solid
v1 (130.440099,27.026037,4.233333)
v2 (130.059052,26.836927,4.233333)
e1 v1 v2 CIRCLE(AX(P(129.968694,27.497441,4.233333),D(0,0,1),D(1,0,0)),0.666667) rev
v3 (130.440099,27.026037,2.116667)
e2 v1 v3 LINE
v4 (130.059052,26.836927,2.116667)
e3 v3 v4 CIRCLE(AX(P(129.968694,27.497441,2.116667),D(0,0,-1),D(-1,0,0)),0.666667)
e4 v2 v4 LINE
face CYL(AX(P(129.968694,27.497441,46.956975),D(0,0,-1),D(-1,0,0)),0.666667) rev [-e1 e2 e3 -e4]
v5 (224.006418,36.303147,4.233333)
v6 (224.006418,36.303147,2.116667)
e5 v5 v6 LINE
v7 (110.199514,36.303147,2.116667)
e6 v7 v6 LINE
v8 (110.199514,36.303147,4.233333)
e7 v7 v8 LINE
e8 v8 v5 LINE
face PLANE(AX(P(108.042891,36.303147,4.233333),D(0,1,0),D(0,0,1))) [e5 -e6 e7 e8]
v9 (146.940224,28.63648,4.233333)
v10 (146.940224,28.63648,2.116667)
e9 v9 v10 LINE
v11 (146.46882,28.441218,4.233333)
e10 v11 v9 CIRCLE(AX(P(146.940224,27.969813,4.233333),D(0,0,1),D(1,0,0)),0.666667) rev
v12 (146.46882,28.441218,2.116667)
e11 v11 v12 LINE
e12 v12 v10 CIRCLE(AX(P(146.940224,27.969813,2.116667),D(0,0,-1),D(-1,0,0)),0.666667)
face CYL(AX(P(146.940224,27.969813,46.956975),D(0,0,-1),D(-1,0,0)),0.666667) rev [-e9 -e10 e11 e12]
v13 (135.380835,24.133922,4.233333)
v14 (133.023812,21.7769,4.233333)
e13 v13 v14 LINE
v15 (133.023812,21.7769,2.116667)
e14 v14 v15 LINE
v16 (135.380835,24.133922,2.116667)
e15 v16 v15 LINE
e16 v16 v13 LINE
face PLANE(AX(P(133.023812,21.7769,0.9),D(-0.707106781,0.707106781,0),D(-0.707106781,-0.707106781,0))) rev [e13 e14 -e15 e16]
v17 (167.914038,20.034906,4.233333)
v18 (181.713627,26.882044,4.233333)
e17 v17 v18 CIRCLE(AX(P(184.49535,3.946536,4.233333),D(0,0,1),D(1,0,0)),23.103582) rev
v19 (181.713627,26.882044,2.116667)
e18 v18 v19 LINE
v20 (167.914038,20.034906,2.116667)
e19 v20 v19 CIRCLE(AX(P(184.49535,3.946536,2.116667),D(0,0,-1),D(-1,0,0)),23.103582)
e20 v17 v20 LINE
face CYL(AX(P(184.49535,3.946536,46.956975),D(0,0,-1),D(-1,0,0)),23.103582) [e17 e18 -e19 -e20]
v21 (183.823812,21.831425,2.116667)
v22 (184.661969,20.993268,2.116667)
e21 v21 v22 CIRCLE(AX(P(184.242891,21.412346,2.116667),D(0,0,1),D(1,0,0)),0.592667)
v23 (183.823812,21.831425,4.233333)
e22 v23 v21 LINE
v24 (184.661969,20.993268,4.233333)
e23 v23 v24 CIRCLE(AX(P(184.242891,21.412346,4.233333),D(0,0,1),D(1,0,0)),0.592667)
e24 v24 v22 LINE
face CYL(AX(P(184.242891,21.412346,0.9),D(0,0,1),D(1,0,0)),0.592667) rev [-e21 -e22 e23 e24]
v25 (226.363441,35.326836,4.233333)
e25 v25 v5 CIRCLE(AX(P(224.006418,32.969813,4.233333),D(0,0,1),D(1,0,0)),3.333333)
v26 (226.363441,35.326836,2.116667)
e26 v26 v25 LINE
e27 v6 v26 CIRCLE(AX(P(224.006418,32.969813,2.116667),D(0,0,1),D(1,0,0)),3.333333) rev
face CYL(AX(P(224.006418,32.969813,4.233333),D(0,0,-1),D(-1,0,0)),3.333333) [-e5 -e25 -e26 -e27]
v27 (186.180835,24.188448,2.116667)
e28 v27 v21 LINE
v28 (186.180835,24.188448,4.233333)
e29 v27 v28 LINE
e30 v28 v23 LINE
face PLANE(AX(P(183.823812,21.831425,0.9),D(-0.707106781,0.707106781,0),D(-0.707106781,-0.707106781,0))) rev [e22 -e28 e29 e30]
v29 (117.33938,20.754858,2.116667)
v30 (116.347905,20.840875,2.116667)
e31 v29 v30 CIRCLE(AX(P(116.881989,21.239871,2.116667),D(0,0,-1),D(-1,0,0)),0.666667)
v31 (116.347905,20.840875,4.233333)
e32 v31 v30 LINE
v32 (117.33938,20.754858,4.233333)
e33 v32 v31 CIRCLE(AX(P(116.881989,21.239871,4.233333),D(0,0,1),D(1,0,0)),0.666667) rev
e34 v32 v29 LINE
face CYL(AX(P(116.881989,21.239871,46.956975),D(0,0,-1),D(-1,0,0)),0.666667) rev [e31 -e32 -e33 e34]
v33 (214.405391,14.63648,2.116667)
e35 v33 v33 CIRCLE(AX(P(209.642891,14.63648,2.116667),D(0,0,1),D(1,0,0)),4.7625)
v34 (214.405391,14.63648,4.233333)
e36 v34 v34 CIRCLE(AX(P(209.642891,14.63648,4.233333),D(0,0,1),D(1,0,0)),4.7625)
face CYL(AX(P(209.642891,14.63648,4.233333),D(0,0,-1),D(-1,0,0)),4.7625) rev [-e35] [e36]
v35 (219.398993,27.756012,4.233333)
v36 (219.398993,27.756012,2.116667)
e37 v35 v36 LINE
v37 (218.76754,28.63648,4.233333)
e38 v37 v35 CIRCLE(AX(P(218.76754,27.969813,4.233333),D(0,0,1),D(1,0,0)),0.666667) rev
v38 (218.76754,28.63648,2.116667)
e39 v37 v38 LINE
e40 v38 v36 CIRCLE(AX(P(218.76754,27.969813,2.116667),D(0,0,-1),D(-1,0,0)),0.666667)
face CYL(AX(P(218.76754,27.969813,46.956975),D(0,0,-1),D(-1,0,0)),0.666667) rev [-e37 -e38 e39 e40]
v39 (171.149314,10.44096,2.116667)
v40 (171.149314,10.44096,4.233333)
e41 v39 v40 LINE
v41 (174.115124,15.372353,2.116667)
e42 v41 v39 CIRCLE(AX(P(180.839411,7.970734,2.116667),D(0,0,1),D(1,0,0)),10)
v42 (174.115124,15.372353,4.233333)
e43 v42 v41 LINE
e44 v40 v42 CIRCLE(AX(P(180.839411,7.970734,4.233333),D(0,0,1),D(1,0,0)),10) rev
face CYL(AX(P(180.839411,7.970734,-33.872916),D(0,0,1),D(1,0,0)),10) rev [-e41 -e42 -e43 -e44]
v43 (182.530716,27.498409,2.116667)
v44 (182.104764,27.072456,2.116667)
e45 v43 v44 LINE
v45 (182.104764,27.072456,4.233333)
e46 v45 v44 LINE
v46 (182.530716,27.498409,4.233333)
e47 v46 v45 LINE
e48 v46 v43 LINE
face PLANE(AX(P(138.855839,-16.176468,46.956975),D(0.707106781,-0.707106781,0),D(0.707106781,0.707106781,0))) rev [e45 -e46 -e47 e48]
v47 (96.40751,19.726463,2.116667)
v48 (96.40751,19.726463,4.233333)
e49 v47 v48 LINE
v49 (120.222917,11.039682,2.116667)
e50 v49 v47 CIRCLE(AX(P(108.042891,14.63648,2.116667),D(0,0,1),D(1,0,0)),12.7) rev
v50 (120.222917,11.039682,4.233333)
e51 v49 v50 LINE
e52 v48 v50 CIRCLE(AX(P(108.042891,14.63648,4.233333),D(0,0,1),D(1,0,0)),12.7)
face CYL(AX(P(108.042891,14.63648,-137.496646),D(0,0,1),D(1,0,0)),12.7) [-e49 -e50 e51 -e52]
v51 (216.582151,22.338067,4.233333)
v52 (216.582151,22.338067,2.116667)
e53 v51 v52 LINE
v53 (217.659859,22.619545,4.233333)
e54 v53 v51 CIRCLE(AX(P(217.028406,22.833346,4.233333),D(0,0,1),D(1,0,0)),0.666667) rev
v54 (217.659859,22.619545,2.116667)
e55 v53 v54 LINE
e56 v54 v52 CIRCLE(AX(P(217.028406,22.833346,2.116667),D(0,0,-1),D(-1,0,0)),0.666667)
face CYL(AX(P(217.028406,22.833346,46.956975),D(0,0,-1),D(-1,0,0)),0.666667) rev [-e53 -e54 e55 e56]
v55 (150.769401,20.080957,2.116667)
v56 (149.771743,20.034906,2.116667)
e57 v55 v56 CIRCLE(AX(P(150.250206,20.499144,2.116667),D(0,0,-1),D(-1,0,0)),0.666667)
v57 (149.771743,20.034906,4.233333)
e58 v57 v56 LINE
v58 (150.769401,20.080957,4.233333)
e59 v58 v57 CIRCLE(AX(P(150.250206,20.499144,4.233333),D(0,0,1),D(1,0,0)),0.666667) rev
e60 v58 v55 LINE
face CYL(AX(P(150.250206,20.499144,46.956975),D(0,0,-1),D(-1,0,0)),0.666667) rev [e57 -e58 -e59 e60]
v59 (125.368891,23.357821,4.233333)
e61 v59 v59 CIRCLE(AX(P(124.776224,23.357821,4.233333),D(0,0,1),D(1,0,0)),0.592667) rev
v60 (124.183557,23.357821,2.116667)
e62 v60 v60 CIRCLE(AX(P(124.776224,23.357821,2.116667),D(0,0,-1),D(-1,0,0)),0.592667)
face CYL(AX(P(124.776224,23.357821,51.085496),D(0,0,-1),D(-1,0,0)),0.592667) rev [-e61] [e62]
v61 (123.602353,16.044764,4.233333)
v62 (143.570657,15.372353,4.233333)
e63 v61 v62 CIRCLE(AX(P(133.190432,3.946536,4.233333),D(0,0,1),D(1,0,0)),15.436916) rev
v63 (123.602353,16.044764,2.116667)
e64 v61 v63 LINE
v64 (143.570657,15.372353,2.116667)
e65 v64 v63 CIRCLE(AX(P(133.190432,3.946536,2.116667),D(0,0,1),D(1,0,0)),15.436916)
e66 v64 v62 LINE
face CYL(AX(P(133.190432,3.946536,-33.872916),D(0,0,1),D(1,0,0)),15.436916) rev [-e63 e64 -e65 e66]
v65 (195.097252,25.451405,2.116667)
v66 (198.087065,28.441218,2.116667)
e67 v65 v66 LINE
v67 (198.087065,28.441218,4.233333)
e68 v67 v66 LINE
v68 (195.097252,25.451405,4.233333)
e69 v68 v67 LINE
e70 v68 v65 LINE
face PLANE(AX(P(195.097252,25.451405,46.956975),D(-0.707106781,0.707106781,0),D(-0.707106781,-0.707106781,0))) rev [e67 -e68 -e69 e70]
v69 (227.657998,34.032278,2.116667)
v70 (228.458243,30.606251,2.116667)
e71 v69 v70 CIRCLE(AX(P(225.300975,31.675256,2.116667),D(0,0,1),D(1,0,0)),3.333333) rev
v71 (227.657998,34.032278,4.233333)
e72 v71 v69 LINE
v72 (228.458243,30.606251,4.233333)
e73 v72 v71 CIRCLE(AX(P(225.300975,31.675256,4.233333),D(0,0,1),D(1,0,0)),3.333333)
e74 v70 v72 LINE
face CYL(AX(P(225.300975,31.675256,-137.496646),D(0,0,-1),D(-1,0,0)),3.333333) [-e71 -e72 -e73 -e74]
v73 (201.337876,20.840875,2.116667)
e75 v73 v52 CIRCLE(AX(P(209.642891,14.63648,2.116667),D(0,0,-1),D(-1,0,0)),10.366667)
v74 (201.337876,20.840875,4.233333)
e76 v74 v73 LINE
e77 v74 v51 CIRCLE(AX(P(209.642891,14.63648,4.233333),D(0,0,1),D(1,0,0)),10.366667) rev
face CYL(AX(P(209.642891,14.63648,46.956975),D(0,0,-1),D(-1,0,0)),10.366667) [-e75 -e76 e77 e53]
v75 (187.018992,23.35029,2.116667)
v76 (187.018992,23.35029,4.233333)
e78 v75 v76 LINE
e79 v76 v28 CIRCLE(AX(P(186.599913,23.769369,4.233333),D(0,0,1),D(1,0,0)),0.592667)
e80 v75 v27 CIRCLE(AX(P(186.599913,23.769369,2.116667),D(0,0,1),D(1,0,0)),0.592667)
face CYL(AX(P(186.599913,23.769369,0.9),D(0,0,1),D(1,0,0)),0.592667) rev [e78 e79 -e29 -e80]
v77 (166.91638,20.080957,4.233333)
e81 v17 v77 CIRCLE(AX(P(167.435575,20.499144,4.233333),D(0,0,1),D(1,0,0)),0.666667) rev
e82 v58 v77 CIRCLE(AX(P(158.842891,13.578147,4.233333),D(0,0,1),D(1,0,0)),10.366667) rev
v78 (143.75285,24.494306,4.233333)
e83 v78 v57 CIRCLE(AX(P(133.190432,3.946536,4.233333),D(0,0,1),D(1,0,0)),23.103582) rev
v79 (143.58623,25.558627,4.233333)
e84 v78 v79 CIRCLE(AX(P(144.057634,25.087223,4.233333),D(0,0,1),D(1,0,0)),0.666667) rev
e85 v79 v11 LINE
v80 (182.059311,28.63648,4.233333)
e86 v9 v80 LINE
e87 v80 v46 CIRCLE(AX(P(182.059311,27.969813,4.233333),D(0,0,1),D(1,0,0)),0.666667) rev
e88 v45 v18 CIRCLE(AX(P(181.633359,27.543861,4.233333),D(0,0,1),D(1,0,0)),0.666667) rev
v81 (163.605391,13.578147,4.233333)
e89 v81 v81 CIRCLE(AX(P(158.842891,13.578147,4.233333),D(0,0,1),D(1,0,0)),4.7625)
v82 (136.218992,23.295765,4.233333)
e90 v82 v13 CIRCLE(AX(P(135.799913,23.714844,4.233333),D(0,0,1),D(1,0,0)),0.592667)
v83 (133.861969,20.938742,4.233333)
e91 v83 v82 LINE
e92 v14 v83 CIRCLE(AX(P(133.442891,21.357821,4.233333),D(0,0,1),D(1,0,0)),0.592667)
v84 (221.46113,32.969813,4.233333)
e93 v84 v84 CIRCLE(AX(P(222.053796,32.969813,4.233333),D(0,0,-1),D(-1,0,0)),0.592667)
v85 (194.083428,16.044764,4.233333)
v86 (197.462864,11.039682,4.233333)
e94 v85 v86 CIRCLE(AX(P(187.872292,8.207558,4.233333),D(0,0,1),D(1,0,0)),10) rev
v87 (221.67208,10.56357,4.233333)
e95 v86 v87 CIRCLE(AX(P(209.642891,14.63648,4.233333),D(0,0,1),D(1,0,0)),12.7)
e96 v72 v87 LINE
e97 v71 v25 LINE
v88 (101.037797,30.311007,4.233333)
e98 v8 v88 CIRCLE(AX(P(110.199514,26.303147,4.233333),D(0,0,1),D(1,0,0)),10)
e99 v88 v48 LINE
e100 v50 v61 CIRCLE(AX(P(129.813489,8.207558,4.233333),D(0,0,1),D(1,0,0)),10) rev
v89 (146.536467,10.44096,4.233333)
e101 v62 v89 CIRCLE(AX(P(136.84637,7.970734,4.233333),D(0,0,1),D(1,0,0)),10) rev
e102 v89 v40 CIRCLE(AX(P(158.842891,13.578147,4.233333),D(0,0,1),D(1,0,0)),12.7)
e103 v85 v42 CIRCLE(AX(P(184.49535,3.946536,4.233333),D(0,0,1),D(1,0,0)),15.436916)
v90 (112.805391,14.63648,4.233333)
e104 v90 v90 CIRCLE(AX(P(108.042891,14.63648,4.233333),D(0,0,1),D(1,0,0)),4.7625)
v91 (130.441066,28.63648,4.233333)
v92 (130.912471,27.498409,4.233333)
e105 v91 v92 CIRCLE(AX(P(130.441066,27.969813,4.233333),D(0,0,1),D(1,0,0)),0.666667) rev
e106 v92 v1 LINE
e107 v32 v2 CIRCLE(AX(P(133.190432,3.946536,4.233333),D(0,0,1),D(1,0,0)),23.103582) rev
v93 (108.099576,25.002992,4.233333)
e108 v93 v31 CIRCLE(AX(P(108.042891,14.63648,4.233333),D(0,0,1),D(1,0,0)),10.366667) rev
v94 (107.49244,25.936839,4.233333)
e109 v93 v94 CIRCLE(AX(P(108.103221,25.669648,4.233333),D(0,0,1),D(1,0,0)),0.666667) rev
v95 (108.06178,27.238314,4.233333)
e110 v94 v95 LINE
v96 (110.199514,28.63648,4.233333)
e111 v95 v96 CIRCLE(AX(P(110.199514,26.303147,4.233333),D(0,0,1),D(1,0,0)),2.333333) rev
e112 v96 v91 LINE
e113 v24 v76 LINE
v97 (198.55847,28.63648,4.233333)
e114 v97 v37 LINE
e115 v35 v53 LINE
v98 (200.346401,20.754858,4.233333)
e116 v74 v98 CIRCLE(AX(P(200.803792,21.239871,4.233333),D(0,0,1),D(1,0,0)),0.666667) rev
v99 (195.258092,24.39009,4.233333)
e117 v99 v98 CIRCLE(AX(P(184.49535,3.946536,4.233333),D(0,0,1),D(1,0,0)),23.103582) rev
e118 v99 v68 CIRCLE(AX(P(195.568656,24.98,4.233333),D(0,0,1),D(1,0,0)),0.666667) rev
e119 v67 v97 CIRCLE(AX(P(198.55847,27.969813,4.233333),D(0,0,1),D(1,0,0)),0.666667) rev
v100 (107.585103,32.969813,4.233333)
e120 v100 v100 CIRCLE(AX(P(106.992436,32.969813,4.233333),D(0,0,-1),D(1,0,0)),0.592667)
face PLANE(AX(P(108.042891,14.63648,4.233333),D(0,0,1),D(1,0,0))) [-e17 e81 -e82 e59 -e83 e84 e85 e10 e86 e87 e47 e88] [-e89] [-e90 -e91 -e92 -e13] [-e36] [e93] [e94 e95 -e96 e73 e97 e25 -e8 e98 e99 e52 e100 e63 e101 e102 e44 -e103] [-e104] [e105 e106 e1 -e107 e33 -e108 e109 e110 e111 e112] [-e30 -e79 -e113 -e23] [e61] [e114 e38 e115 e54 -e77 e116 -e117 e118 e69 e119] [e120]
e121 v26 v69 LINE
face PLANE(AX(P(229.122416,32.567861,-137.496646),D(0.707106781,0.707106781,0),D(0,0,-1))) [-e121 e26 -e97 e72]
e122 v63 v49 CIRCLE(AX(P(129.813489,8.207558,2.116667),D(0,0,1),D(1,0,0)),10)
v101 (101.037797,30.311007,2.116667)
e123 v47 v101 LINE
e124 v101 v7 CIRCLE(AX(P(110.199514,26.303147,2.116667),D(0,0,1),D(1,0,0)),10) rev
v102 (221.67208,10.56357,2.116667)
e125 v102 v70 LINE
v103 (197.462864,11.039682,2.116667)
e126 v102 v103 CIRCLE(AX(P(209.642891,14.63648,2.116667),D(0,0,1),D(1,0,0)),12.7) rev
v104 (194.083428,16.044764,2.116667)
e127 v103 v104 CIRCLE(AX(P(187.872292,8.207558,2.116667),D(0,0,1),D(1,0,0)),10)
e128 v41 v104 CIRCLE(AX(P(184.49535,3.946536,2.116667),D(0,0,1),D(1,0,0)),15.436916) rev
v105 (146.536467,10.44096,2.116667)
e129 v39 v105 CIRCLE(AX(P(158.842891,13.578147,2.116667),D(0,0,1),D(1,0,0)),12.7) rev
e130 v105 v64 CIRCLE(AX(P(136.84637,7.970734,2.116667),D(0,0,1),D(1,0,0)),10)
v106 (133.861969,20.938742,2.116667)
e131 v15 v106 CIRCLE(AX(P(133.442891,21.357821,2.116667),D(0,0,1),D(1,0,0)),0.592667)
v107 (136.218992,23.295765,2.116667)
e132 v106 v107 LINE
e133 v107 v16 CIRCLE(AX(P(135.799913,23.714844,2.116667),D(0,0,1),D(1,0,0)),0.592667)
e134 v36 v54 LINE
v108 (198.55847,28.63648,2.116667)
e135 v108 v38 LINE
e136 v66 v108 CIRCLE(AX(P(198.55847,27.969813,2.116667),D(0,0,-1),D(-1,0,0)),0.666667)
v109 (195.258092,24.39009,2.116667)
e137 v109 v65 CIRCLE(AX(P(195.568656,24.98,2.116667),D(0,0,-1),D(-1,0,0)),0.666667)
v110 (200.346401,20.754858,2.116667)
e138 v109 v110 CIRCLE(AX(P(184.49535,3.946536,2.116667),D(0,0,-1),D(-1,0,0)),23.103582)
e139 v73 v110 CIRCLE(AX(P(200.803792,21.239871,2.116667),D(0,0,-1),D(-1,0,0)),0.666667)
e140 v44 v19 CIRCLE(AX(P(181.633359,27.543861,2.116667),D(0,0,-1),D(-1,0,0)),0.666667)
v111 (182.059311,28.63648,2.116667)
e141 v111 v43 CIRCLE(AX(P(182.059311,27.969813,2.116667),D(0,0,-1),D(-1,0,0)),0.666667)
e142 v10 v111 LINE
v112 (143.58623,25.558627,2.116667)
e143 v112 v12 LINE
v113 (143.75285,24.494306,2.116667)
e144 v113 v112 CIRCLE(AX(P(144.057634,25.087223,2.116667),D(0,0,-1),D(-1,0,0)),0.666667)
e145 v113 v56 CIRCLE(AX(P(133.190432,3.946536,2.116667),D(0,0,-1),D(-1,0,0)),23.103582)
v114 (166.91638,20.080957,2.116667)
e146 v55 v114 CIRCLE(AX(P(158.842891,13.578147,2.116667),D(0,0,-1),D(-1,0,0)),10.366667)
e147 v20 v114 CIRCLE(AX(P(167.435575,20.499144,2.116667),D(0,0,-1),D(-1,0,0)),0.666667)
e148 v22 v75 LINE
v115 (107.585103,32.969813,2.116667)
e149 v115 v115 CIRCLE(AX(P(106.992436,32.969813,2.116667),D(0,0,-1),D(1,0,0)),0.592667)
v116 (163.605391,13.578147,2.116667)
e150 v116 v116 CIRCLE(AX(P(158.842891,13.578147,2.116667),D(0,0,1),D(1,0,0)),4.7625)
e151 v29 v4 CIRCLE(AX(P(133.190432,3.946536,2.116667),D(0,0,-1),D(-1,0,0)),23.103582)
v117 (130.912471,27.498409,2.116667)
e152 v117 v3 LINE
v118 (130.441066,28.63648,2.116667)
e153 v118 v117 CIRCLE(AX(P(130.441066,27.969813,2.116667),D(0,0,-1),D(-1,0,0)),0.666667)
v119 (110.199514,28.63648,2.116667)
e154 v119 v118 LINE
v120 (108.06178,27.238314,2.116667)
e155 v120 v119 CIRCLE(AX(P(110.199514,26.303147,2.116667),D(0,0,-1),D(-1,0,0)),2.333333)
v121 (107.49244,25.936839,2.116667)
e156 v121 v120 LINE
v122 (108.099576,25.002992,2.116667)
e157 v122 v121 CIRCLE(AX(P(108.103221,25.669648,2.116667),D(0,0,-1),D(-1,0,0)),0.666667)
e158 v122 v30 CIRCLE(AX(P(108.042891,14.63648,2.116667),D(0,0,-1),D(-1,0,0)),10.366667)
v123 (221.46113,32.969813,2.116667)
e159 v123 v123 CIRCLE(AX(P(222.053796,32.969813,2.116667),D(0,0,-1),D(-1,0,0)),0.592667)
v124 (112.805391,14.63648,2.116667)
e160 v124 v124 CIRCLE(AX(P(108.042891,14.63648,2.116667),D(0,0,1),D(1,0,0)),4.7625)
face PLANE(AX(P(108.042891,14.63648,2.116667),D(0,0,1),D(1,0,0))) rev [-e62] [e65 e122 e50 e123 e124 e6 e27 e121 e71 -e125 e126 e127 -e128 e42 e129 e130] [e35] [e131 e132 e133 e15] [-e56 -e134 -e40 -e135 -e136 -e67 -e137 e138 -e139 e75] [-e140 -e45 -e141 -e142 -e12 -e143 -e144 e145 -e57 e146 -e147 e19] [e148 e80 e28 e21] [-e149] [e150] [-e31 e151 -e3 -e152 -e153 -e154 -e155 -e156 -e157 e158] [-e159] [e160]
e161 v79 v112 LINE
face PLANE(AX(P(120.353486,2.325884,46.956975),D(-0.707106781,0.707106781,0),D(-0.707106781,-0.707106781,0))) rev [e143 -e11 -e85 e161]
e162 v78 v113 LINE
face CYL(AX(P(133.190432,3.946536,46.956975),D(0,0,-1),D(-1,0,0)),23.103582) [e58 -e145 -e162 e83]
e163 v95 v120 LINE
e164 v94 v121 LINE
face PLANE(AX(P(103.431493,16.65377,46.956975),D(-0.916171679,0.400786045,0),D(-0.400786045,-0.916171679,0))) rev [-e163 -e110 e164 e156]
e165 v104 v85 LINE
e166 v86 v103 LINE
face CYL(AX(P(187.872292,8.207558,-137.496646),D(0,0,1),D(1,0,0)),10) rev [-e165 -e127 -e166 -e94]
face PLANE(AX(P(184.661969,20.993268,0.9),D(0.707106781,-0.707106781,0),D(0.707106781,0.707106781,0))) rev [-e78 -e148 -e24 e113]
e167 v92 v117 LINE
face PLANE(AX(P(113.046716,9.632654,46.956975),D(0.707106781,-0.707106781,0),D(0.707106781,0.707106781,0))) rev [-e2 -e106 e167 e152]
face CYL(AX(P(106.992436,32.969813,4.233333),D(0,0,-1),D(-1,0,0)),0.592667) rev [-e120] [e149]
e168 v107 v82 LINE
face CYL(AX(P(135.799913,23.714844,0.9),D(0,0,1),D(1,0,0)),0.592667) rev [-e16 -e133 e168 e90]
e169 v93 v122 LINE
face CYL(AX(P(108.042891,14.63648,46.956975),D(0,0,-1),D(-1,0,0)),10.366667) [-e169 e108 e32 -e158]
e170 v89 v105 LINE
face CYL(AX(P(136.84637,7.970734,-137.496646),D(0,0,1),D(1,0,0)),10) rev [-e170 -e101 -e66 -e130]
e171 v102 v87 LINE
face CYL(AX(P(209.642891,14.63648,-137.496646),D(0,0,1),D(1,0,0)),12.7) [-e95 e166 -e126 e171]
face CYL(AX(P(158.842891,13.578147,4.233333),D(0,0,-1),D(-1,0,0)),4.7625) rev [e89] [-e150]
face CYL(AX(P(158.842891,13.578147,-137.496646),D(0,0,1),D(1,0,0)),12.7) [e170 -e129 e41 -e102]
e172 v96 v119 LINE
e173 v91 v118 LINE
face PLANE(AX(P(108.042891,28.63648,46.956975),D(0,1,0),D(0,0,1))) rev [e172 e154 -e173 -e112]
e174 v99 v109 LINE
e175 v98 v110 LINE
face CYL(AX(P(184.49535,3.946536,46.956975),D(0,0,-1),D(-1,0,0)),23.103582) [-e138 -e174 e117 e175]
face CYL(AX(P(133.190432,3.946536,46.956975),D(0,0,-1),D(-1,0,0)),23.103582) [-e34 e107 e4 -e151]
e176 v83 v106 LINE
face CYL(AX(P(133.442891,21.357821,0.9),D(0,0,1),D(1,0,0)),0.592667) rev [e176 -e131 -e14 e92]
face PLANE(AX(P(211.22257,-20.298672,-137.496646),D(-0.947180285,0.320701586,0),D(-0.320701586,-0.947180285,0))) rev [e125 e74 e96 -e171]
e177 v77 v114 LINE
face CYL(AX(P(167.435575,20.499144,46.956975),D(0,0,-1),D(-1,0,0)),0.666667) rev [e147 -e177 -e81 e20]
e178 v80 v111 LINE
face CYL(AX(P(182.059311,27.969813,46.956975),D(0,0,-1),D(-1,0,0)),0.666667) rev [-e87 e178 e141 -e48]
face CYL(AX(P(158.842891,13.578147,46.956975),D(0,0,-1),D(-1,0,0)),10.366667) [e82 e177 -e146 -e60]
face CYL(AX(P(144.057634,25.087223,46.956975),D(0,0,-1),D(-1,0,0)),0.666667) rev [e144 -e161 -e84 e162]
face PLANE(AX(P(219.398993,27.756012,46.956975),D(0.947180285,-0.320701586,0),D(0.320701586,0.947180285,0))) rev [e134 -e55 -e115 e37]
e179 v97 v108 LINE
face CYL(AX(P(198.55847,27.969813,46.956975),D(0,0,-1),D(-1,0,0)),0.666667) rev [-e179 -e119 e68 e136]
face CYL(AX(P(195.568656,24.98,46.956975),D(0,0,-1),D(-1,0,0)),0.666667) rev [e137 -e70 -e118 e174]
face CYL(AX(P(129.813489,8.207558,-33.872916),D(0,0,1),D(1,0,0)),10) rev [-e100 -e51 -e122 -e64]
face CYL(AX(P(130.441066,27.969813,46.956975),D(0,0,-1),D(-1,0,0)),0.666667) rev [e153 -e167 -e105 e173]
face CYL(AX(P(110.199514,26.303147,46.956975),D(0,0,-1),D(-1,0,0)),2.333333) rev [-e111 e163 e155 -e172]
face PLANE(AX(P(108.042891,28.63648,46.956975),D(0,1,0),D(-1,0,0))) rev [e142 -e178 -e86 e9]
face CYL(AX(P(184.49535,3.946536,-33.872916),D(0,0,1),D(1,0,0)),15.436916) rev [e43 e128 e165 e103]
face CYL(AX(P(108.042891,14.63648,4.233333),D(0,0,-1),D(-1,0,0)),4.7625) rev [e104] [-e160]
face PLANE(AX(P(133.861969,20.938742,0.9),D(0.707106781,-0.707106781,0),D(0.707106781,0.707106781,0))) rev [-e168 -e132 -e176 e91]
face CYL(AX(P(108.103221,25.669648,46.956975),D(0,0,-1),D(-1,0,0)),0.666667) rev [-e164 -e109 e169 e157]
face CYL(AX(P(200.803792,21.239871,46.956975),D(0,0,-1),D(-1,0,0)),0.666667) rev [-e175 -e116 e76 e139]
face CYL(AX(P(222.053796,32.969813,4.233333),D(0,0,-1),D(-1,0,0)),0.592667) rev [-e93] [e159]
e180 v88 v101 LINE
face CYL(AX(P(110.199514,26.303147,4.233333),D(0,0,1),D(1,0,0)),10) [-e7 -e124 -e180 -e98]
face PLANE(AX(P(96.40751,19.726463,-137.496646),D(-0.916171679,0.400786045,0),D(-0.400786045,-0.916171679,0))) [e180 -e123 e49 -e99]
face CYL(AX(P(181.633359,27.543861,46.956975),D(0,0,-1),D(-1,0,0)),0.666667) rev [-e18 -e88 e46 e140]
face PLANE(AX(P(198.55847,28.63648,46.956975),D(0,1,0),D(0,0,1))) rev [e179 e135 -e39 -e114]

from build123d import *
from build123d.topology import SkipClean

# Parameters (mm, degrees)
SKETCH1_R           = 14.2875
BOSS_EXTRUDE1_DEPTH = 6.35
FILLET1_R           = 10
FILLET2_R           = 20
SKETCH2_R           = 1.778
CUT_EXTRUDE1_DEPTH  = 6.35
FILLET4_R           = 28.4734
BOSS_EXTRUDE2_DEPTH = 6.35
FILLET7_R           = 30
CUT_EXTRUDE4_DEPTH  = 6.35
FILLET9_DEPTH       = 6.35
SKETCH6_R           = 1.778
CUT_EXTRUDE5_DEPTH  = 10
CHAMFER1_SIZE       = 15
CHAMFER1_SIZE2      = 11.830755168
FILLET11_R          = 10
BOSS_EXTRUDE3_DEPTH = 6.35
SKETCH8_R           = 1.778
BOSS_EXTRUDE4_DEPTH = 6.35
CUT_EXTRUDE6_DEPTH  = 10
FILLET12_R          = 10
FILLET13_R          = 10
FILLET14_R          = 10
FILLET15_R          = 10
FILLET16_R          = 10
CUT_EXTRUDE7_DEPTH  = 10
BOSS_EXTRUDE5_START = -6.35
SKETCH10_R          = 1.778
BOSS_EXTRUDE5_DEPTH = 6.35
FILLET17_R          = 30
BOSS_EXTRUDE6_START = -6.35
BOSS_EXTRUDE6_DEPTH = 6.35
SCALE1_SCALE        = 0.333333333


with BuildPart() as part:
    # Sketch1 → Boss-Extrude1 (new body)
    with BuildSketch(Plane.XY):
        with BuildLine():
            Line((76.2, 30), (19.765397885, -21.612188753))
            ThreePointArc((19.765397885, -21.612188753), (-7.664310495, -28.266871084), (-27.975511048, -8.66766623))
            Line((-27.975511048, -8.66766623), (-30.661018302, 0))
            Line((-30.661018302, 0), (-10.522036605, 65))
            Line((-10.522036605, 65), (355.6, 65))
            Line((355.6, 65), (332.775511048, -8.66766623))
            ThreePointArc((332.775511048, -8.66766623), (312.464310495, -28.266871084), (285.034602115, -21.612188753))
            Line((285.034602115, -21.612188753), (228.6, 30))
            Line((228.6, 30), (172.803916322, -24.185422532))
            ThreePointArc((172.803916322, -24.185422532), (152.4, -32.637001398), (131.996083678, -24.185422532))
            Line((131.996083678, -24.185422532), (76.2, 30))
        make_face()
        Circle(SKETCH1_R, mode=Mode.SUBTRACT)
        with Locations((152.4, -3.175)):
            Circle(SKETCH1_R, mode=Mode.SUBTRACT)
        with Locations((304.8, 0)):
            Circle(SKETCH1_R, mode=Mode.SUBTRACT)
    extrude(amount=BOSS_EXTRUDE1_DEPTH)

    # Fillet1
    fillet1_edges = [part.edges().sort_by_distance(p)[0] for p in [
        (-10.522036605, 65, 3.175),
        (355.6, 65, 3.175),
    ]]
    fillet(fillet1_edges, radius=FILLET1_R)

    # Fillet2
    fillet2_edges = [part.edges().sort_by_distance(p)[0] for p in [
        (228.6, 30, 3.175),
        (76.2, 30, 3.175),
    ]]
    fillet(fillet2_edges, radius=FILLET2_R)

    # Sketch2 → Cut-Extrude1 (cut)
    with BuildSketch(Plane(origin=(0, 0, 0), x_dir=(-1, 0, 0), z_dir=(0, 0, -1))):
        with Locations((-229.01165953, 23.51851186)):
            Circle(SKETCH2_R)
        with Locations((-342.03271747, 55)):
            Circle(SKETCH2_R)
        with Locations((-76.34605429, 23.51851186)):
            Circle(SKETCH2_R)
        with Locations(Location((3.151363828, 55, 0), (0, 0, 180))):
            Circle(SKETCH2_R)
    extrude(amount=-CUT_EXTRUDE1_DEPTH, mode=Mode.SUBTRACT)

    # Fillet4
    fillet4_edges = [part.edges().sort_by_distance(p)[0] for p in [
        (-30.661018302, 0, 3.175),
    ]]
    fillet(fillet4_edges, radius=FILLET4_R)

    # Sketch4 → Boss-Extrude2 (add)
    with BuildSketch(Plane.XY.offset(6.35)):
        with BuildLine():
            ThreePointArc((-12.703394916, 57.95951045), (-9.084528898, 63.04969268), (-3.151363828, 65))
            Line((-3.151363828, 65), (-13.151363828, 65))
            Line((-13.151363828, 65), (-34.906140988, 15.269948308))
            ThreePointArc((-34.906140988, 15.269948308), (-10.316360553, -36.676732474), (37.748130536, -5.166105019))
            Line((37.748130536, -5.166105019), (19.765397885, -21.612188753))
            ThreePointArc((19.765397885, -21.612188753), (-7.664310495, -28.266871084), (-27.975511048, -8.66766623))
            Line((-27.975511048, -8.66766623), (-28.050159667, -8.426732485))
            ThreePointArc((-28.050159667, -8.426732485), (-29.325679471, 0), (-28.050159667, 8.426732485))
            Line((-28.050159667, 8.426732485), (-12.703394916, 57.95951045))
        make_face()
        with BuildLine():
            Line((367.03271747, 65), (342.03271747, 65))
            ThreePointArc((342.03271747, 65), (350.08241015, 60.93316507), (351.584748558, 52.04048955))
            Line((351.584748558, 52.04048955), (332.775511048, -8.66766623))
            ThreePointArc((332.775511048, -8.66766623), (312.464310495, -28.266871084), (285.034602115, -21.612188753))
            Line((285.034602115, -21.612188753), (267.051869464, -5.166105019))
            ThreePointArc((267.051869464, -5.166105019), (301.177259665, -37.927374711), (340.887568868, -12.218730424))
            Line((340.887568868, -12.218730424), (367.03271747, 65))
        make_face()
        with BuildLine():
            Line((62.290842982, 17.279399331), (60.592342389, 15.72603792))
            Line((60.592342389, 15.72603792), (68.130864542, 20.996768873))
            ThreePointArc((68.130864542, 20.996768873), (65.048790473, 19.392687011), (62.290842982, 17.279399331))
        make_face()
        with BuildLine():
            ThreePointArc((74.888341467, 22.500495492), (71.444046197, 22.043232685), (68.130864542, 20.996768873))
            Line((68.130864542, 20.996768873), (105.753753933, 1.29937195))
            Line((105.753753933, 1.29937195), (89.721872743, 16.868462091))
            ThreePointArc((89.721872743, 16.868462091), (84.206374965, 20.662880592), (77.747671619, 22.424549857))
            ThreePointArc((77.747671619, 22.424549857), (76.393262458, 25.295885031), (74.888341467, 22.500495492))
        make_face()
        with BuildLine():
            Line((220.832871891, 20.771986703), (256.207126926, 4.751939547))
            Line((256.207126926, 4.751939547), (242.509157018, 17.279399331))
            ThreePointArc((242.509157018, 17.279399331), (236.916143222, 20.892449631), (230.446997722, 22.469184326))
            ThreePointArc((230.446997722, 22.469184326), (229.01165953, 25.29651186), (227.576321337, 22.469184326))
            ThreePointArc((227.576321337, 22.469184326), (224.130268968, 21.915910418), (220.832871891, 20.771986703))
        make_face()
        with BuildLine():
            Line((211.556759647, 13.448745522), (220.832871891, 20.771986703))
            ThreePointArc((220.832871891, 20.771986703), (217.784547298, 19.072249628), (215.078127257, 16.868462091))
            Line((215.078127257, 16.868462091), (211.556759647, 13.448745522))
        make_face()
        with BuildLine():
            Line((131.996083678, -24.185422532), (114.514059271, -7.208050345))
            ThreePointArc((114.514059271, -7.208050345), (152.4, -41.275), (190.285940729, -7.208050345))
            Line((190.285940729, -7.208050345), (172.803916322, -24.185422532))
            ThreePointArc((172.803916322, -24.185422532), (152.4, -32.637001398), (131.996083678, -24.185422532))
        make_face()
    extrude(amount=-BOSS_EXTRUDE2_DEPTH)

    # Fillet7
    # the kernel refuses this fillet: 30 mm, written as the material it adds along each edge
    with BuildSketch(Plane(origin=(220.832871891, 20.771986703, 6.35), x_dir=(-0.7848829847834699, -0.6196440108621978, 0), z_dir=(0, 0, -1))) as fillet7_piece_1:
        with BuildLine():
            CenterArc((18.669895515, -29.207154991), FILLET7_R, 103.201773783, 49.45286053)
            Line((-7.977718615, -15.426564975), (0, 0))
            Line((0, 0), (11.818465203, 0))
        make_face()
    extrude(amount=6.35)
    with BuildSketch(Plane(origin=(68.130864542, 20.996768873, 6.35), x_dir=(-0.819550218760279, -0.5730073637659283, 0), z_dir=(0, 0, -1))) as fillet7_piece_2:
        with BuildLine():
            CenterArc((19.112116789, -28.314616862), FILLET7_R, 109.296600171, 43.297831689)
            Line((-7.521002941, -14.506034983), (0, 0))
            Line((0, 0), (9.198365128, 0))
        make_face()
    extrude(amount=6.35)
    # the kernel refuses this fillet: 30 mm, written as the material it takes off along each edge
    with BuildSketch(Plane(origin=(-13.151363828, 65, 55.403084312), x_dir=(-0.4007860448353176, -0.9161716794713002, 0), z_dir=(0, 0, -1))) as fillet7_2_piece_1:
        with BuildLine():
            CenterArc((FILLET7_R * 0.65404112416, -FILLET7_R), FILLET7_R, 90, 66.372672864)
            Line((-FILLET7_R * 0.262130555312, -FILLET7_R * 0.599213955165), (0, 0))
            Line((0, 0), (FILLET7_R * 0.65404112416, 0))
        make_face()
    extrude(amount=104.456168624, mode=Mode.SUBTRACT)

    # Sketch5 → Cut-Extrude4 (cut)
    with BuildSketch(Plane.XY.offset(6.35)):
        with BuildLine():
            ThreePointArc((202.727550006, 25.783673337), (222.609463156, 31.248183301), (242.841525508, 27.271376461))
            Line((242.841525508, 27.271376461), (264.569178734, 17.431507638))
            Line((264.569178734, 17.431507638), (281.763141289, 1.706792524))
            ThreePointArc((281.763141289, 1.706792524), (305.653980027, 23.084209281), (327.9, 0))
            ThreePointArc((327.9, 0), (327.592925131, -3.754006392), (326.679864589, -7.408206635))
            Line((326.679864589, -7.408206635), (346.117455511, 50))
            Line((346.117455511, 50), (6.469869897, 50))
            ThreePointArc((6.469869897, 50), (-1.740585021, 47.553423041), (-7.272705295, 41.011790673))
            Line((-7.272705295, 41.011790673), (-21.163565796, 9.258157636))
            ThreePointArc((-21.163565796, 9.258157636), (3.890126649, 22.770088156), (23.036858711, 1.706792524))
            Line((23.036858711, 1.706792524), (52.825875761, 28.950297628))
            ThreePointArc((52.825875761, 28.950297628), (71.4348738, 31.756464685), (89.564149012, 26.706834809))
            Line((89.564149012, 26.706834809), (114.641099784, 13.577841769))
            Line((114.641099784, 13.577841769), (129.424605527, -0.77890968))
            ThreePointArc((129.424605527, -0.77890968), (152.4, 19.925), (175.375394473, -0.77890968))
            Line((175.375394473, -0.77890968), (202.727550006, 25.783673337))
        make_face()
    extrude(amount=-CUT_EXTRUDE4_DEPTH, mode=Mode.SUBTRACT)

    # Fillet9: read off the stored shape, not the designer's step
    # Fillet9 outline → Fillet9 (add)
    with BuildSketch(Plane.XY):
        with BuildLine():
            Line((346.117455511, 50), (332.173947538, 50))
            ThreePointArc((332.173947538, 50), (340.300144637, 45.827943094), (341.64575039, 36.792984141))
            Line((341.64575039, 36.792984141), (346.117455511, 50))
        make_face()
        with BuildLine():
            Line((326.679864589, -7.408206635), (336.428348814, 21.383581349))
            ThreePointArc((336.428348814, 21.383581349), (329.483593888, 14.915162915), (320.262725429, 17.161413762))
            ThreePointArc((320.262725429, 17.161413762), (327.150253218, 5.837480712), (326.679864589, -7.408206635))
        make_face()
        with BuildLine():
            ThreePointArc((0.126311649, 23.099654659), (-8.202890478, 27.648769951), (-8.980724779, 37.107365609))
            Line((-8.980724779, 37.107365609), (-21.163565796, 9.258157636))
            ThreePointArc((-21.163565796, 9.258157636), (-12.591198333, 19.366768562), (0.126311649, 23.099654659))
        make_face()
    extrude(amount=FILLET9_DEPTH)

    # Sketch6 → Cut-Extrude5 (cut)
    with BuildSketch(Plane.XY.offset(6.35)):
        with Locations((76.2, 20.164023691)):
            Circle(SKETCH6_R)
        with Locations((228.6, 20.32759964)):
            Circle(SKETCH6_R)
    extrude(amount=-CUT_EXTRUDE5_DEPTH, mode=Mode.SUBTRACT)

    # Chamfer1
    chamfer1_edges = [part.edges().sort_by_distance(p)[0] for p in [
        (367.03271747, 65, 3.175),
    ]]
    chamfer1_side = [part.faces().sort_by_distance(p)[0] for p in [
        (186.751293683, 65, 3.175),
    ]]
    chamfer(chamfer1_edges, length=CHAMFER1_SIZE, length2=CHAMFER1_SIZE2, reference=chamfer1_side[0])

    # Fillet11
    fillet11_edges = [part.edges().sort_by_distance(p)[0] for p in [
        (363.238575525, 53.794141945, 3.175),
        (352.03271747, 65, 3.175),
    ]]
    fillet(fillet11_edges, radius=FILLET11_R)

    # Sketch7 → Boss-Extrude3 (add)
    with BuildSketch(Plane.XY.offset(6.35)):
        Polygon((100.225182041, 58.888519513), (69.228437645, 27.891775117), (86.023226415, 23.473360451), (115.72256861, 53.172702646), align=None)
        Polygon((224.083172996, 27.891775117), (239.038298252, 21.633696938), (270.57730396, 53.172702646), (247.971808558, 51.78041068), align=None)
    extrude(amount=-BOSS_EXTRUDE3_DEPTH)

    # Sketch8 → Boss-Extrude4 (add)
    # profile 1 of 8: a face of its own
    with BuildSketch(Plane.XY.offset(6.35)):
        with BuildLine():
            Line((42.965540082, 19.932541018), (26.540335697, 4.910892646))
            ThreePointArc((26.540335697, 4.910892646), (26.03493106, 4.232890698), (25.538925832, 3.547982455))
            Line((25.538925832, 3.547982455), (37.748130536, -5.166105019))
            ThreePointArc((37.748130536, -5.166105019), (44.188663643, 2.104358832), (52.003991477, 7.871573252))
            Line((52.003991477, 7.871573252), (60.592342389, 15.72603792))
            ThreePointArc((60.592342389, 15.72603792), (71.406290885, 16.717093686), (81.86459706, 13.793481951))
            ThreePointArc((81.86459706, 13.793481951), (100.496139451, 6.878937362), (114.514059271, -7.208050345))
            Line((114.514059271, -7.208050345), (127.169254419, 0.844653286))
            ThreePointArc((127.169254419, 0.844653286), (126.658671717, 1.633641021), (126.136055565, 2.414709969))
            Line((126.136055565, 2.414709969), (114.641099784, 13.577841769))
            Line((114.641099784, 13.577841769), (89.564149012, 26.706834809))
            ThreePointArc((89.564149012, 26.706834809), (89.463102992, 26.759574333), (89.361923711, 26.812057747))
            Line((89.361923711, 26.812057747), (90.030119482, 27.480253519))
            ThreePointArc((90.030119482, 27.480253519), (80.261374749, 29.051255746), (70.367134521, 29.030471993))
            ThreePointArc((70.367134521, 29.030471993), (56.12315118, 26.117501091), (42.965540082, 19.932541018))
        make_face()
        with Locations((76.2, 20.164023691)):
            Circle(SKETCH8_R, mode=Mode.SUBTRACT)
    # profile 2 of 8: a face of its own
    with BuildSketch(Plane.XY.offset(6.35)):
        with BuildLine():
            ThreePointArc((126.136055565, 2.414709969), (110.406465662, 18.294217169), (90.030119482, 27.480253519))
            Line((90.030119482, 27.480253519), (89.361923711, 26.812057747))
            ThreePointArc((89.361923711, 26.812057747), (89.463102992, 26.759574333), (89.564149012, 26.706834809))
            Line((89.564149012, 26.706834809), (114.641099784, 13.577841769))
            Line((114.641099784, 13.577841769), (126.136055565, 2.414709969))
        make_face()
    # profile 3 of 8: a face of its own
    with BuildSketch(Plane.XY.offset(6.35)):
        with BuildLine():
            Line((60.592342389, 15.72603792), (52.003991477, 7.871573252))
            ThreePointArc((52.003991477, 7.871573252), (66.43379909, 13.356222223), (81.86459706, 13.793481951))
            ThreePointArc((81.86459706, 13.793481951), (71.406290885, 16.717093686), (60.592342389, 15.72603792))
        make_face()
    # profile 4 of 8: a face of its own
    with BuildSketch(Plane.XY.offset(6.35)):
        with BuildLine():
            Line((196.372099466, 19.611685086), (178.663944435, 2.414709969))
            ThreePointArc((178.663944435, 2.414709969), (178.141328283, 1.633641021), (177.630745581, 0.844653286))
            Line((177.630745581, 0.844653286), (190.285940729, -7.208050345))
            ThreePointArc((190.285940729, -7.208050345), (197.093762385, 1.152818304), (205.650401581, 7.712885828))
            Line((205.650401581, 7.712885828), (211.556759647, 13.448745522))
            ThreePointArc((211.556759647, 13.448745522), (223.983698914, 16.277662761), (236.463614039, 13.692452762))
            ThreePointArc((236.463614039, 13.692452762), (253.661443339, 7.350945008), (267.051869464, -5.166105019))
            Line((267.051869464, -5.166105019), (279.261074168, 3.547982455))
            ThreePointArc((279.261074168, 3.547982455), (278.76506894, 4.232890698), (278.259664303, 4.910892646))
            Line((278.259664303, 4.910892646), (264.569178734, 17.431507638))
            Line((264.569178734, 17.431507638), (244.104163185, 26.699561871))
            Line((244.104163185, 26.699561871), (244.695857174, 27.29125586))
            ThreePointArc((244.695857174, 27.29125586), (235.069370607, 28.974257477), (225.297764534, 29.106366656))
            ThreePointArc((225.297764534, 29.106366656), (210.236231282, 26.182975027), (196.372099466, 19.611685086))
        make_face()
        with Locations((228.6, 20.32759964)):
            Circle(SKETCH8_R, mode=Mode.SUBTRACT)
    # profile 5 of 8: a face of its own
    with BuildSketch(Plane.XY.offset(6.35)):
        with BuildLine():
            Line((211.556759647, 13.448745522), (205.650401581, 7.712885828))
            ThreePointArc((205.650401581, 7.712885828), (220.5349661, 13.392794234), (236.463614039, 13.692452762))
            ThreePointArc((236.463614039, 13.692452762), (223.983698914, 16.277662761), (211.556759647, 13.448745522))
        make_face()
    # profile 6 of 8: a face of its own
    with BuildSketch(Plane.XY.offset(6.35)):
        with BuildLine():
            ThreePointArc((278.259664303, 4.910892646), (263.371186182, 18.940642396), (244.695857174, 27.29125586))
            Line((244.695857174, 27.29125586), (244.104163185, 26.699561871))
            Line((244.104163185, 26.699561871), (264.569178734, 17.431507638))
            Line((264.569178734, 17.431507638), (278.259664303, 4.910892646))
        make_face()
    # profile 7 of 8: a face of its own
    with BuildSketch(Plane.XY.offset(6.35)):
        with BuildLine():
            ThreePointArc((196.372099466, 19.611685086), (186.64361318, 11.913598089), (178.663944435, 2.414709969))
            Line((178.663944435, 2.414709969), (196.372099466, 19.611685086))
        make_face()
    # profile 8 of 8: a face of its own
    with BuildSketch(Plane.XY.offset(6.35)):
        with BuildLine():
            ThreePointArc((42.965540082, 19.932541018), (34.065540526, 13.173341548), (26.540335697, 4.910892646))
            Line((26.540335697, 4.910892646), (42.965540082, 19.932541018))
        make_face()
    extrude(amount=-BOSS_EXTRUDE4_DEPTH)

    # Sketch8<3> → Cut-Extrude6 (cut)
    with SkipClean():  # the faces are left unmerged after this step: merging them gives an invalid solid
        with BuildSketch(Plane.XY.offset(6.35)):
            with BuildLine():
                Line((26.540335697, 4.910892646), (23.036858711, 1.706792524))
                ThreePointArc((23.036858711, 1.706792524), (23.086771831, 0.781643421), (23.099546395, -0.144763074))
                ThreePointArc((23.099546395, -0.144763074), (24.756867192, 2.425991729), (26.540335697, 4.910892646))
            make_face()
            with BuildLine():
                Line((52.825875761, 28.950297628), (42.965540082, 19.932541018))
                ThreePointArc((42.965540082, 19.932541018), (56.12315118, 26.117501091), (70.367134521, 29.030471993))
                Line((70.367134521, 29.030471993), (72.972728384, 31.636065856))
                ThreePointArc((72.972728384, 31.636065856), (62.745683135, 31.445529161), (52.825875761, 28.950297628))
            make_face()
            with BuildLine():
                ThreePointArc((52.003991477, 7.871573252), (44.188663643, 2.104358832), (37.748130536, -5.166105019))
                Line((37.748130536, -5.166105019), (52.003991477, 7.871573252))
            make_face()
            with BuildLine():
                Line((105.753753933, 1.29937195), (114.514059271, -7.208050345))
                ThreePointArc((114.514059271, -7.208050345), (100.496139451, 6.878937362), (81.86459706, 13.793481951))
                ThreePointArc((81.86459706, 13.793481951), (82.236984648, 13.608280674), (82.606769012, 13.417934797))
                Line((82.606769012, 13.417934797), (105.753753933, 1.29937195))
            make_face()
            with BuildLine():
                ThreePointArc((126.136055565, 2.414709969), (127.78416506, -0.142246527), (129.303415047, -2.777805464))
                ThreePointArc((129.303415047, -2.777805464), (129.342339274, -1.777043687), (129.424605527, -0.77890968))
                Line((129.424605527, -0.77890968), (126.136055565, 2.414709969))
            make_face()
            with BuildLine():
                ThreePointArc((205.650401581, 7.712885828), (197.093762385, 1.152818304), (190.285940729, -7.208050345))
                Line((190.285940729, -7.208050345), (205.650401581, 7.712885828))
            make_face()
            with BuildLine():
                Line((256.207126926, 4.751939547), (267.051869464, -5.166105019))
                ThreePointArc((267.051869464, -5.166105019), (253.661443339, 7.350945008), (236.463614039, 13.692452762))
                ThreePointArc((236.463614039, 13.692452762), (236.558593891, 13.65003287), (236.653426084, 13.6072839))
                Line((236.653426084, 13.6072839), (256.207126926, 4.751939547))
            make_face()
            with BuildLine():
                ThreePointArc((175.496584953, -2.777805464), (177.01583494, -0.142246527), (178.663944435, 2.414709969))
                Line((178.663944435, 2.414709969), (175.375394473, -0.77890968))
                ThreePointArc((175.375394473, -0.77890968), (175.457660726, -1.777043687), (175.496584953, -2.777805464))
            make_face()
            with BuildLine():
                ThreePointArc((278.259664303, 4.910892646), (280.043132809, 2.425991728), (281.700453605, -0.144763074))
                ThreePointArc((281.700453605, -0.144763074), (281.713228169, 0.781643421), (281.763141289, 1.706792524))
                Line((281.763141289, 1.706792524), (278.259664303, 4.910892646))
            make_face()
            with BuildLine():
                Line((225.297764534, 29.106366656), (227.364470932, 31.173073053))
                ThreePointArc((227.364470932, 31.173073053), (214.660742934, 30.239572268), (202.727550006, 25.783673337))
                Line((202.727550006, 25.783673337), (196.372099466, 19.611685086))
                ThreePointArc((196.372099466, 19.611685086), (210.236231282, 26.182975027), (225.297764534, 29.106366656))
            make_face()
        extrude(amount=-CUT_EXTRUDE6_DEPTH, mode=Mode.SUBTRACT)

    # Fillet12
    fillet12_edges = [part.edges().sort_by_distance(p)[0] for p in [
        (23.099546395, -0.144763074, 3.175),
    ]]
    fillet(fillet12_edges, radius=FILLET12_R)

    # Fillet13
    fillet13_edges = [part.edges().sort_by_distance(p)[0] for p in [
        (129.303415047, -2.777805464, 3.175),
        (175.496584953, -2.777805464, 3.175),
        (281.700453605, -0.144763074, 3.175),
    ]]
    fillet(fillet13_edges, radius=FILLET13_R)

    # Fillet14
    fillet14_edges = [part.edges().sort_by_distance(p)[0] for p in [
        (225.297764534, 29.106366656, 3.175),
        (70.367134521, 29.030471993, 3.175),
    ]]
    fillet(fillet14_edges, radius=FILLET14_R)

    # Fillet15
    fillet15_edges = [part.edges().sort_by_distance(p)[0] for p in [
        (267.404601314, 50, 3.175),
        (91.336662528, 50, 3.175),
        (112.549865964, 50, 3.175),
        (244.695857174, 27.29125586, 3.175),
        (90.030119482, 27.480253519, 3.175),
    ]]
    fillet(fillet15_edges, radius=FILLET15_R)

    # Fillet16
    fillet16_edges = [part.edges().sort_by_distance(p)[0] for p in [
        (246.191397879, 50, 3.175),
    ]]
    fillet(fillet16_edges, radius=FILLET16_R)

    # Sketch9 → Cut-Extrude7 (cut)
    with SkipClean():  # the faces are left unmerged after this step: merging them gives an invalid solid
        with BuildSketch(Plane.XY.offset(6.35)):
            with BuildLine():
                Line((74.942764143, 21.421259548), (82.013831955, 28.49232736))
                ThreePointArc((82.013831955, 28.49232736), (84.528303669, 28.49232736), (84.528303669, 25.977855646))
                Line((84.528303669, 25.977855646), (77.457235857, 18.906787834))
                ThreePointArc((77.457235857, 18.906787834), (74.942764143, 18.906787834), (74.942764143, 21.421259548))
            make_face()
            with BuildLine():
                Line((227.342764143, 21.584835497), (234.413831955, 28.655903309))
                ThreePointArc((234.413831955, 28.655903309), (236.928303669, 28.655903309), (236.928303669, 26.141431595))
                Line((236.928303669, 26.141431595), (229.857235857, 19.070363783))
                ThreePointArc((229.857235857, 19.070363783), (227.342764143, 19.070363783), (227.342764143, 21.584835497))
            make_face()
        extrude(amount=-CUT_EXTRUDE7_DEPTH, mode=Mode.SUBTRACT)

    # Sketch10 → Boss-Extrude5 (add)
    # profile 1 of 3: a face of its own
    with SkipClean():  # the faces are left unmerged after this step: merging them gives an invalid solid
        with BuildSketch(Plane(origin=(0, 0, 0), x_dir=(-1, 0, 0), z_dir=(0, 0, -1)).offset(BOSS_EXTRUDE5_START)):
            with BuildLine():
                ThreePointArc((-67.194526904, 50), (-76.433322229, 43.826834324), (-74.265594716, 32.928932188))
                Line((-74.265594716, 32.928932188), (-72.848479306, 31.511816778))
                ThreePointArc((-72.848479306, 31.511816778), (-70.222953971, 29.625365286), (-67.132776867, 28.675161103))
                ThreePointArc((-67.132776867, 28.675161103), (-54.584312682, 25.583776849), (-42.962627059, 19.930721632))
                ThreePointArc((-42.962627059, 19.930721632), (-41.828685193, 19.205024398), (-40.71095078, 18.45460424))
                ThreePointArc((-40.71095078, 18.45460424), (-36.930649094, 15.635886475), (-33.378159261, 12.534972634))
                ThreePointArc((-33.378159261, 12.534972634), (-25.652977382, 9.847596586), (-18.506028464, 13.825227321))
                ThreePointArc((-18.506028464, 13.825227321), (-10.406477556, 20.623172037), (-0.126311649, 23.099654659))
                ThreePointArc((-0.126311649, 23.099654659), (8.202890478, 27.648769951), (8.980724779, 37.107365609))
                Line((8.980724779, 37.107365609), (7.272705295, 41.011790673))
                ThreePointArc((7.272705295, 41.011790673), (1.740585021, 47.553423041), (-6.469869897, 50))
                Line((-6.469869897, 50), (-67.194526904, 50))
            make_face()
            with Locations((-50.2, 26.164023691)):
                Circle(SKETCH10_R, mode=Mode.SUBTRACT)
            with BuildLine():
                Line((-69.3129454, 35.047350684), (-70.73006081, 36.464466094))
                ThreePointArc((-70.73006081, 36.464466094), (-71.813924567, 41.913417162), (-67.194526904, 45))
                Line((-67.194526904, 45), (-6.469869897, 45))
                ThreePointArc((-6.469869897, 45), (-0.996233285, 43.368948694), (2.691846898, 39.007860448))
                Line((2.691846898, 39.007860448), (4.399866381, 35.103435385))
                ThreePointArc((4.399866381, 35.103435385), (4.010949231, 30.374137556), (-0.153651832, 28.09957991))
                ThreePointArc((-0.153651832, 28.09957991), (-12.658961876, 25.087062088), (-22.511662331, 16.817700767))
                ThreePointArc((-22.511662331, 16.817700767), (-26.08513679, 14.8288854), (-29.947727729, 16.172573424))
                ThreePointArc((-29.947727729, 16.172573424), (-46.837281896, 27.753655452), (-66.455094181, 33.629022846))
                ThreePointArc((-66.455094181, 33.629022846), (-68.000182733, 34.104124938), (-69.3129454, 35.047350684))
            make_face(mode=Mode.SUBTRACT)
        # profile 2 of 3: a face of its own
        with BuildSketch(Plane(origin=(0, 0, 0), x_dir=(-1, 0, 0), z_dir=(0, 0, -1)).offset(BOSS_EXTRUDE5_START)):
            with BuildLine():
                ThreePointArc((-222.049262255, 50), (-231.28805758, 43.826834324), (-229.120330067, 32.928932188))
                Line((-229.120330067, 32.928932188), (-227.84247345, 31.651075572))
                ThreePointArc((-227.84247345, 31.651075572), (-225.148473717, 29.730965761), (-221.975427684, 28.794891452))
                ThreePointArc((-221.975427684, 28.794891452), (-202.106159082, 22.851738113), (-185.354998338, 10.624411336))
                ThreePointArc((-185.354998338, 10.624411336), (-177.7169483, 7.598630206), (-170.390122667, 11.315185866))
                ThreePointArc((-170.390122667, 11.315185866), (-152.4, 19.925), (-134.409877333, 11.315185866))
                ThreePointArc((-134.409877333, 11.315185866), (-127.0830517, 7.598630206), (-119.445001662, 10.624411336))
                ThreePointArc((-119.445001662, 10.624411336), (-111.941546557, 17.193098502), (-103.47246446, 22.458470097))
                ThreePointArc((-103.47246446, 22.458470097), (-98.164563741, 29.805562574), (-100.973163037, 38.423297073))
                Line((-100.973163037, 38.423297073), (-109.620933775, 47.071067812))
                ThreePointArc((-109.620933775, 47.071067812), (-112.865167264, 49.238795325), (-116.692001587, 50))
                Line((-116.692001587, 50), (-222.049262255, 50))
            make_face()
            with BuildLine():
                Line((-222.049262255, 45), (-116.692001587, 45))
                ThreePointArc((-116.692001587, 45), (-114.778584426, 44.619397663), (-113.156467681, 43.535533906))
                Line((-113.156467681, 43.535533906), (-104.508696943, 34.887763168))
                ThreePointArc((-104.508696943, 34.887763168), (-103.104397295, 30.578895918), (-105.758347654, 26.905349679))
                ThreePointArc((-105.758347654, 26.905349679), (-114.918098395, 21.210577706), (-123.033473552, 14.106202468))
                ThreePointArc((-123.033473552, 14.106202468), (-126.852498572, 12.593311904), (-130.515911388, 14.451589733))
                ThreePointArc((-130.515911388, 14.451589733), (-152.4, 24.925), (-174.284088612, 14.451589733))
                ThreePointArc((-174.284088612, 14.451589733), (-177.947501428, 12.593311904), (-181.766526448, 14.106202468))
                ThreePointArc((-181.766526448, 14.106202468), (-199.883774016, 27.330689399), (-221.373416661, 33.758517418))
                ThreePointArc((-221.373416661, 33.758517418), (-222.959939678, 34.226554572), (-224.306939544, 35.186609478))
                Line((-224.306939544, 35.186609478), (-225.584796161, 36.464466094))
                ThreePointArc((-225.584796161, 36.464466094), (-226.668659917, 41.913417162), (-222.049262255, 45))
            make_face(mode=Mode.SUBTRACT)
        # profile 3 of 3: a face of its own
        with BuildSketch(Plane(origin=(0, 0, 0), x_dir=(-1, 0, 0), z_dir=(0, 0, -1)).offset(BOSS_EXTRUDE5_START)):
            with BuildLine():
                ThreePointArc((-257.918824258, 22.181909427), (-252.690189928, 29.532193538), (-255.506229694, 38.10162838))
                Line((-255.506229694, 38.10162838), (-264.475669126, 47.071067812))
                ThreePointArc((-264.475669126, 47.071067812), (-267.719902614, 49.238795325), (-271.546736938, 50))
                Line((-271.546736938, 50), (-332.173947538, 50))
                ThreePointArc((-332.173947538, 50), (-340.300144637, 45.827943094), (-341.64575039, 36.792984141))
                Line((-341.64575039, 36.792984141), (-336.428348814, 21.383581349))
                ThreePointArc((-336.428348814, 21.383581349), (-329.483593889, 14.915162915), (-320.262725429, 17.161413762))
                ThreePointArc((-320.262725429, 17.161413762), (-302.54213412, 22.989389763), (-286.293971536, 13.825227321))
                ThreePointArc((-286.293971536, 13.825227321), (-279.147022618, 9.847596586), (-271.421840739, 12.534972634))
                ThreePointArc((-271.421840739, 12.534972634), (-264.998233798, 17.817411245), (-257.918824258, 22.181909427))
            make_face()
            with BuildLine():
                Line((-268.011203032, 43.535533906), (-259.0417636, 34.566094474))
                ThreePointArc((-259.0417636, 34.566094474), (-257.633743717, 30.281377053), (-260.248060882, 26.606234998))
                ThreePointArc((-260.248060882, 26.606234998), (-267.904808807, 21.885804259), (-274.852272271, 16.172573424))
                ThreePointArc((-274.852272271, 16.172573424), (-278.71486321, 14.8288854), (-282.288337669, 16.817700767))
                ThreePointArc((-282.288337669, 16.817700767), (-302.053418561, 27.965448153), (-323.609635695, 20.876005485))
                ThreePointArc((-323.609635695, 20.876005485), (-328.220069925, 19.752880062), (-331.692447387, 22.987089279))
                Line((-331.692447387, 22.987089279), (-336.909848964, 38.39649207))
                ThreePointArc((-336.909848964, 38.39649207), (-336.237046087, 42.913971547), (-332.173947538, 45))
                Line((-332.173947538, 45), (-271.546736938, 45))
                ThreePointArc((-271.546736938, 45), (-269.633319776, 44.619397663), (-268.011203032, 43.535533906))
            make_face(mode=Mode.SUBTRACT)
        extrude(amount=BOSS_EXTRUDE5_DEPTH)

    # Fillet17
    fillet17_edges = [part.edges().sort_by_distance(p)[0] for p in [
        (190.285940729, -7.208050345, 3.175),
        (267.051869464, -5.166105019, 3.175),
        (114.514059271, -7.208050345, 3.175),
        (37.748130536, -5.166105019, 3.175),
    ]]
    fillet(fillet17_edges, radius=FILLET17_R)

    # Boss-Extrude6: read off the stored shape, not the designer's step
    # Boss-Extrude6 outline → Boss-Extrude6 (add)
    # profile 1 of 3: a face of its own
    with SkipClean():  # the faces are left unmerged after this step: merging them gives an invalid solid
        with BuildSketch(Plane(origin=(0, 0, 0), x_dir=(-1, 0, 0), z_dir=(0, 0, -1)).offset(BOSS_EXTRUDE6_START)):
            with BuildLine():
                ThreePointArc((-66.455094181, 33.629022846), (-46.837281896, 27.753655452), (-29.947727729, 16.172573424))
                ThreePointArc((-29.947727729, 16.172573424), (-26.08513679, 14.8288854), (-22.511662331, 16.817700767))
                ThreePointArc((-22.511662331, 16.817700767), (-12.658961876, 25.087062088), (-0.153651832, 28.09957991))
                ThreePointArc((-0.153651832, 28.09957991), (4.010949231, 30.374137556), (4.399866381, 35.103435385))
                Line((4.399866381, 35.103435385), (2.691846898, 39.007860448))
                ThreePointArc((2.691846898, 39.007860448), (-0.996233285, 43.368948694), (-6.469869897, 45))
                Line((-6.469869897, 45), (-67.194526904, 45))
                ThreePointArc((-67.194526904, 45), (-71.813924567, 41.913417162), (-70.73006081, 36.464466094))
                Line((-70.73006081, 36.464466094), (-69.3129454, 35.047350684))
                ThreePointArc((-69.3129454, 35.047350684), (-68.000182733, 34.104124938), (-66.455094181, 33.629022846))
            make_face()
            with BuildLine():
                Line((-0.05666814, 37.805502314), (1.651351343, 33.90107725))
                ThreePointArc((1.651351343, 33.90107725), (1.495784483, 32.009358118), (-0.170055943, 31.09953506))
                ThreePointArc((-0.170055943, 31.09953506), (-14.010452468, 27.765396119), (-24.915042651, 18.613184835))
                ThreePointArc((-24.915042651, 18.613184835), (-26.344432434, 17.817658688), (-27.88946881, 18.355133898))
                ThreePointArc((-27.88946881, 18.355133898), (-45.543132337, 30.460161857), (-66.048484569, 36.601339893))
                ThreePointArc((-66.048484569, 36.601339893), (-66.66651999, 36.791380729), (-67.191625057, 37.168671028))
                Line((-67.191625057, 37.168671028), (-68.608740467, 38.585786438))
                ThreePointArc((-68.608740467, 38.585786438), (-69.042285969, 40.765366865), (-67.194526904, 42))
                Line((-67.194526904, 42), (-6.469869897, 42))
                ThreePointArc((-6.469869897, 42), (-2.638324268, 40.858264086), (-0.05666814, 37.805502314))
            make_face(mode=Mode.SUBTRACT)
        # profile 2 of 3: a face of its own
        with BuildSketch(Plane(origin=(0, 0, 0), x_dir=(-1, 0, 0), z_dir=(0, 0, -1)).offset(BOSS_EXTRUDE6_START)):
            with BuildLine():
                ThreePointArc((-123.033473552, 14.106202468), (-114.918098395, 21.210577706), (-105.758347654, 26.905349679))
                ThreePointArc((-105.758347654, 26.905349679), (-103.104397295, 30.578895918), (-104.508696943, 34.887763168))
                Line((-104.508696943, 34.887763168), (-113.156467681, 43.535533906))
                ThreePointArc((-113.156467681, 43.535533906), (-114.778584425, 44.619397663), (-116.692001587, 45))
                Line((-116.692001587, 45), (-222.049262255, 45))
                ThreePointArc((-222.049262255, 45), (-226.668659917, 41.913417162), (-225.584796161, 36.464466094))
                Line((-225.584796161, 36.464466094), (-224.306939544, 35.186609478))
                ThreePointArc((-224.306939544, 35.186609478), (-222.959939678, 34.226554572), (-221.373416661, 33.758517418))
                ThreePointArc((-221.373416661, 33.758517418), (-199.883774016, 27.330689399), (-181.766526448, 14.106202468))
                ThreePointArc((-181.766526448, 14.106202468), (-177.947501429, 12.593311904), (-174.284088612, 14.451589733))
                ThreePointArc((-174.284088612, 14.451589733), (-152.4, 24.925), (-130.515911388, 14.451589733))
                ThreePointArc((-130.515911388, 14.451589733), (-126.852498571, 12.593311904), (-123.033473552, 14.106202468))
            make_face()
            with BuildLine():
                ThreePointArc((-106.630017287, 32.766442824), (-106.068297427, 31.042895924), (-107.129877571, 29.573477429))
                ThreePointArc((-107.129877571, 29.573477429), (-116.704029498, 23.621065228), (-125.186556687, 16.195277148))
                ThreePointArc((-125.186556687, 16.195277148), (-126.714166695, 15.590120922), (-128.179531821, 16.333432054))
                ThreePointArc((-128.179531821, 16.333432054), (-152.4, 27.925), (-176.620468179, 16.333432054))
                ThreePointArc((-176.620468179, 16.333432054), (-178.085833305, 15.590120922), (-179.613443313, 16.195277148))
                ThreePointArc((-179.613443313, 16.195277148), (-198.550342977, 30.01806017), (-221.012210047, 36.736692997))
                ThreePointArc((-221.012210047, 36.736692997), (-221.646819254, 36.923907859), (-222.185619201, 37.307929821))
                Line((-222.185619201, 37.307929821), (-223.463475817, 38.585786438))
                ThreePointArc((-223.463475817, 38.585786438), (-223.89702132, 40.765366865), (-222.049262255, 42))
                Line((-222.049262255, 42), (-116.692001587, 42))
                ThreePointArc((-116.692001587, 42), (-115.926634722, 41.847759065), (-115.277788025, 41.414213562))
                Line((-115.277788025, 41.414213562), (-106.630017287, 32.766442824))
            make_face(mode=Mode.SUBTRACT)
        # profile 3 of 3: a face of its own
        with BuildSketch(Plane(origin=(0, 0, 0), x_dir=(-1, 0, 0), z_dir=(0, 0, -1)).offset(BOSS_EXTRUDE6_START)):
            with BuildLine():
                ThreePointArc((-268.011203032, 43.535533906), (-269.633319776, 44.619397663), (-271.546736938, 45))
                Line((-271.546736938, 45), (-332.173947538, 45))
                ThreePointArc((-332.173947538, 45), (-336.237046087, 42.913971546), (-336.909848964, 38.39649207))
                Line((-336.909848964, 38.39649207), (-331.692447387, 22.987089279))
                ThreePointArc((-331.692447387, 22.987089279), (-328.220069925, 19.752880062), (-323.609635695, 20.876005485))
                ThreePointArc((-323.609635695, 20.876005485), (-302.053418561, 27.965448153), (-282.288337669, 16.817700767))
                ThreePointArc((-282.288337669, 16.817700767), (-278.71486321, 14.8288854), (-274.852272271, 16.172573424))
                ThreePointArc((-274.852272271, 16.172573424), (-267.904808807, 21.885804259), (-260.248060882, 26.606234998))
                ThreePointArc((-260.248060882, 26.606234998), (-257.633743717, 30.281377053), (-259.0417636, 34.566094474))
                Line((-259.0417636, 34.566094474), (-268.011203032, 43.535533906))
            make_face()
            with BuildLine():
                Line((-332.173947538, 42), (-271.546736938, 42))
                ThreePointArc((-271.546736938, 42), (-270.781370073, 41.847759065), (-270.132523375, 41.414213562))
                Line((-270.132523375, 41.414213562), (-261.163083943, 32.44477413))
                ThreePointArc((-261.163083943, 32.44477413), (-260.59987599, 30.730887162), (-261.645602856, 29.26083034))
                ThreePointArc((-261.645602856, 29.26083034), (-269.648753813, 24.326840067), (-276.91053119, 18.355133898))
                ThreePointArc((-276.91053119, 18.355133898), (-278.455567566, 17.817658688), (-279.884957349, 18.613184835))
                ThreePointArc((-279.884957349, 18.613184835), (-301.760189226, 30.951083187), (-325.617781855, 23.104760519))
                ThreePointArc((-325.617781855, 23.104760519), (-327.461955547, 22.65551035), (-328.850906532, 23.949194037))
                Line((-328.850906532, 23.949194037), (-334.068308108, 39.358596828))
                ThreePointArc((-334.068308108, 39.358596828), (-333.799186957, 41.165588618), (-332.173947538, 42))
            make_face(mode=Mode.SUBTRACT)
        extrude(amount=BOSS_EXTRUDE6_DEPTH)


with BuildPart() as part_1:
    # Scale1: scaled about (162.064336111, 21.954720036, 3.175)
    add(part.part.scale(SCALE1_SCALE).moved(Location((108.042890741, 14.636480024, 2.116666667))))


solid = part_1.part
